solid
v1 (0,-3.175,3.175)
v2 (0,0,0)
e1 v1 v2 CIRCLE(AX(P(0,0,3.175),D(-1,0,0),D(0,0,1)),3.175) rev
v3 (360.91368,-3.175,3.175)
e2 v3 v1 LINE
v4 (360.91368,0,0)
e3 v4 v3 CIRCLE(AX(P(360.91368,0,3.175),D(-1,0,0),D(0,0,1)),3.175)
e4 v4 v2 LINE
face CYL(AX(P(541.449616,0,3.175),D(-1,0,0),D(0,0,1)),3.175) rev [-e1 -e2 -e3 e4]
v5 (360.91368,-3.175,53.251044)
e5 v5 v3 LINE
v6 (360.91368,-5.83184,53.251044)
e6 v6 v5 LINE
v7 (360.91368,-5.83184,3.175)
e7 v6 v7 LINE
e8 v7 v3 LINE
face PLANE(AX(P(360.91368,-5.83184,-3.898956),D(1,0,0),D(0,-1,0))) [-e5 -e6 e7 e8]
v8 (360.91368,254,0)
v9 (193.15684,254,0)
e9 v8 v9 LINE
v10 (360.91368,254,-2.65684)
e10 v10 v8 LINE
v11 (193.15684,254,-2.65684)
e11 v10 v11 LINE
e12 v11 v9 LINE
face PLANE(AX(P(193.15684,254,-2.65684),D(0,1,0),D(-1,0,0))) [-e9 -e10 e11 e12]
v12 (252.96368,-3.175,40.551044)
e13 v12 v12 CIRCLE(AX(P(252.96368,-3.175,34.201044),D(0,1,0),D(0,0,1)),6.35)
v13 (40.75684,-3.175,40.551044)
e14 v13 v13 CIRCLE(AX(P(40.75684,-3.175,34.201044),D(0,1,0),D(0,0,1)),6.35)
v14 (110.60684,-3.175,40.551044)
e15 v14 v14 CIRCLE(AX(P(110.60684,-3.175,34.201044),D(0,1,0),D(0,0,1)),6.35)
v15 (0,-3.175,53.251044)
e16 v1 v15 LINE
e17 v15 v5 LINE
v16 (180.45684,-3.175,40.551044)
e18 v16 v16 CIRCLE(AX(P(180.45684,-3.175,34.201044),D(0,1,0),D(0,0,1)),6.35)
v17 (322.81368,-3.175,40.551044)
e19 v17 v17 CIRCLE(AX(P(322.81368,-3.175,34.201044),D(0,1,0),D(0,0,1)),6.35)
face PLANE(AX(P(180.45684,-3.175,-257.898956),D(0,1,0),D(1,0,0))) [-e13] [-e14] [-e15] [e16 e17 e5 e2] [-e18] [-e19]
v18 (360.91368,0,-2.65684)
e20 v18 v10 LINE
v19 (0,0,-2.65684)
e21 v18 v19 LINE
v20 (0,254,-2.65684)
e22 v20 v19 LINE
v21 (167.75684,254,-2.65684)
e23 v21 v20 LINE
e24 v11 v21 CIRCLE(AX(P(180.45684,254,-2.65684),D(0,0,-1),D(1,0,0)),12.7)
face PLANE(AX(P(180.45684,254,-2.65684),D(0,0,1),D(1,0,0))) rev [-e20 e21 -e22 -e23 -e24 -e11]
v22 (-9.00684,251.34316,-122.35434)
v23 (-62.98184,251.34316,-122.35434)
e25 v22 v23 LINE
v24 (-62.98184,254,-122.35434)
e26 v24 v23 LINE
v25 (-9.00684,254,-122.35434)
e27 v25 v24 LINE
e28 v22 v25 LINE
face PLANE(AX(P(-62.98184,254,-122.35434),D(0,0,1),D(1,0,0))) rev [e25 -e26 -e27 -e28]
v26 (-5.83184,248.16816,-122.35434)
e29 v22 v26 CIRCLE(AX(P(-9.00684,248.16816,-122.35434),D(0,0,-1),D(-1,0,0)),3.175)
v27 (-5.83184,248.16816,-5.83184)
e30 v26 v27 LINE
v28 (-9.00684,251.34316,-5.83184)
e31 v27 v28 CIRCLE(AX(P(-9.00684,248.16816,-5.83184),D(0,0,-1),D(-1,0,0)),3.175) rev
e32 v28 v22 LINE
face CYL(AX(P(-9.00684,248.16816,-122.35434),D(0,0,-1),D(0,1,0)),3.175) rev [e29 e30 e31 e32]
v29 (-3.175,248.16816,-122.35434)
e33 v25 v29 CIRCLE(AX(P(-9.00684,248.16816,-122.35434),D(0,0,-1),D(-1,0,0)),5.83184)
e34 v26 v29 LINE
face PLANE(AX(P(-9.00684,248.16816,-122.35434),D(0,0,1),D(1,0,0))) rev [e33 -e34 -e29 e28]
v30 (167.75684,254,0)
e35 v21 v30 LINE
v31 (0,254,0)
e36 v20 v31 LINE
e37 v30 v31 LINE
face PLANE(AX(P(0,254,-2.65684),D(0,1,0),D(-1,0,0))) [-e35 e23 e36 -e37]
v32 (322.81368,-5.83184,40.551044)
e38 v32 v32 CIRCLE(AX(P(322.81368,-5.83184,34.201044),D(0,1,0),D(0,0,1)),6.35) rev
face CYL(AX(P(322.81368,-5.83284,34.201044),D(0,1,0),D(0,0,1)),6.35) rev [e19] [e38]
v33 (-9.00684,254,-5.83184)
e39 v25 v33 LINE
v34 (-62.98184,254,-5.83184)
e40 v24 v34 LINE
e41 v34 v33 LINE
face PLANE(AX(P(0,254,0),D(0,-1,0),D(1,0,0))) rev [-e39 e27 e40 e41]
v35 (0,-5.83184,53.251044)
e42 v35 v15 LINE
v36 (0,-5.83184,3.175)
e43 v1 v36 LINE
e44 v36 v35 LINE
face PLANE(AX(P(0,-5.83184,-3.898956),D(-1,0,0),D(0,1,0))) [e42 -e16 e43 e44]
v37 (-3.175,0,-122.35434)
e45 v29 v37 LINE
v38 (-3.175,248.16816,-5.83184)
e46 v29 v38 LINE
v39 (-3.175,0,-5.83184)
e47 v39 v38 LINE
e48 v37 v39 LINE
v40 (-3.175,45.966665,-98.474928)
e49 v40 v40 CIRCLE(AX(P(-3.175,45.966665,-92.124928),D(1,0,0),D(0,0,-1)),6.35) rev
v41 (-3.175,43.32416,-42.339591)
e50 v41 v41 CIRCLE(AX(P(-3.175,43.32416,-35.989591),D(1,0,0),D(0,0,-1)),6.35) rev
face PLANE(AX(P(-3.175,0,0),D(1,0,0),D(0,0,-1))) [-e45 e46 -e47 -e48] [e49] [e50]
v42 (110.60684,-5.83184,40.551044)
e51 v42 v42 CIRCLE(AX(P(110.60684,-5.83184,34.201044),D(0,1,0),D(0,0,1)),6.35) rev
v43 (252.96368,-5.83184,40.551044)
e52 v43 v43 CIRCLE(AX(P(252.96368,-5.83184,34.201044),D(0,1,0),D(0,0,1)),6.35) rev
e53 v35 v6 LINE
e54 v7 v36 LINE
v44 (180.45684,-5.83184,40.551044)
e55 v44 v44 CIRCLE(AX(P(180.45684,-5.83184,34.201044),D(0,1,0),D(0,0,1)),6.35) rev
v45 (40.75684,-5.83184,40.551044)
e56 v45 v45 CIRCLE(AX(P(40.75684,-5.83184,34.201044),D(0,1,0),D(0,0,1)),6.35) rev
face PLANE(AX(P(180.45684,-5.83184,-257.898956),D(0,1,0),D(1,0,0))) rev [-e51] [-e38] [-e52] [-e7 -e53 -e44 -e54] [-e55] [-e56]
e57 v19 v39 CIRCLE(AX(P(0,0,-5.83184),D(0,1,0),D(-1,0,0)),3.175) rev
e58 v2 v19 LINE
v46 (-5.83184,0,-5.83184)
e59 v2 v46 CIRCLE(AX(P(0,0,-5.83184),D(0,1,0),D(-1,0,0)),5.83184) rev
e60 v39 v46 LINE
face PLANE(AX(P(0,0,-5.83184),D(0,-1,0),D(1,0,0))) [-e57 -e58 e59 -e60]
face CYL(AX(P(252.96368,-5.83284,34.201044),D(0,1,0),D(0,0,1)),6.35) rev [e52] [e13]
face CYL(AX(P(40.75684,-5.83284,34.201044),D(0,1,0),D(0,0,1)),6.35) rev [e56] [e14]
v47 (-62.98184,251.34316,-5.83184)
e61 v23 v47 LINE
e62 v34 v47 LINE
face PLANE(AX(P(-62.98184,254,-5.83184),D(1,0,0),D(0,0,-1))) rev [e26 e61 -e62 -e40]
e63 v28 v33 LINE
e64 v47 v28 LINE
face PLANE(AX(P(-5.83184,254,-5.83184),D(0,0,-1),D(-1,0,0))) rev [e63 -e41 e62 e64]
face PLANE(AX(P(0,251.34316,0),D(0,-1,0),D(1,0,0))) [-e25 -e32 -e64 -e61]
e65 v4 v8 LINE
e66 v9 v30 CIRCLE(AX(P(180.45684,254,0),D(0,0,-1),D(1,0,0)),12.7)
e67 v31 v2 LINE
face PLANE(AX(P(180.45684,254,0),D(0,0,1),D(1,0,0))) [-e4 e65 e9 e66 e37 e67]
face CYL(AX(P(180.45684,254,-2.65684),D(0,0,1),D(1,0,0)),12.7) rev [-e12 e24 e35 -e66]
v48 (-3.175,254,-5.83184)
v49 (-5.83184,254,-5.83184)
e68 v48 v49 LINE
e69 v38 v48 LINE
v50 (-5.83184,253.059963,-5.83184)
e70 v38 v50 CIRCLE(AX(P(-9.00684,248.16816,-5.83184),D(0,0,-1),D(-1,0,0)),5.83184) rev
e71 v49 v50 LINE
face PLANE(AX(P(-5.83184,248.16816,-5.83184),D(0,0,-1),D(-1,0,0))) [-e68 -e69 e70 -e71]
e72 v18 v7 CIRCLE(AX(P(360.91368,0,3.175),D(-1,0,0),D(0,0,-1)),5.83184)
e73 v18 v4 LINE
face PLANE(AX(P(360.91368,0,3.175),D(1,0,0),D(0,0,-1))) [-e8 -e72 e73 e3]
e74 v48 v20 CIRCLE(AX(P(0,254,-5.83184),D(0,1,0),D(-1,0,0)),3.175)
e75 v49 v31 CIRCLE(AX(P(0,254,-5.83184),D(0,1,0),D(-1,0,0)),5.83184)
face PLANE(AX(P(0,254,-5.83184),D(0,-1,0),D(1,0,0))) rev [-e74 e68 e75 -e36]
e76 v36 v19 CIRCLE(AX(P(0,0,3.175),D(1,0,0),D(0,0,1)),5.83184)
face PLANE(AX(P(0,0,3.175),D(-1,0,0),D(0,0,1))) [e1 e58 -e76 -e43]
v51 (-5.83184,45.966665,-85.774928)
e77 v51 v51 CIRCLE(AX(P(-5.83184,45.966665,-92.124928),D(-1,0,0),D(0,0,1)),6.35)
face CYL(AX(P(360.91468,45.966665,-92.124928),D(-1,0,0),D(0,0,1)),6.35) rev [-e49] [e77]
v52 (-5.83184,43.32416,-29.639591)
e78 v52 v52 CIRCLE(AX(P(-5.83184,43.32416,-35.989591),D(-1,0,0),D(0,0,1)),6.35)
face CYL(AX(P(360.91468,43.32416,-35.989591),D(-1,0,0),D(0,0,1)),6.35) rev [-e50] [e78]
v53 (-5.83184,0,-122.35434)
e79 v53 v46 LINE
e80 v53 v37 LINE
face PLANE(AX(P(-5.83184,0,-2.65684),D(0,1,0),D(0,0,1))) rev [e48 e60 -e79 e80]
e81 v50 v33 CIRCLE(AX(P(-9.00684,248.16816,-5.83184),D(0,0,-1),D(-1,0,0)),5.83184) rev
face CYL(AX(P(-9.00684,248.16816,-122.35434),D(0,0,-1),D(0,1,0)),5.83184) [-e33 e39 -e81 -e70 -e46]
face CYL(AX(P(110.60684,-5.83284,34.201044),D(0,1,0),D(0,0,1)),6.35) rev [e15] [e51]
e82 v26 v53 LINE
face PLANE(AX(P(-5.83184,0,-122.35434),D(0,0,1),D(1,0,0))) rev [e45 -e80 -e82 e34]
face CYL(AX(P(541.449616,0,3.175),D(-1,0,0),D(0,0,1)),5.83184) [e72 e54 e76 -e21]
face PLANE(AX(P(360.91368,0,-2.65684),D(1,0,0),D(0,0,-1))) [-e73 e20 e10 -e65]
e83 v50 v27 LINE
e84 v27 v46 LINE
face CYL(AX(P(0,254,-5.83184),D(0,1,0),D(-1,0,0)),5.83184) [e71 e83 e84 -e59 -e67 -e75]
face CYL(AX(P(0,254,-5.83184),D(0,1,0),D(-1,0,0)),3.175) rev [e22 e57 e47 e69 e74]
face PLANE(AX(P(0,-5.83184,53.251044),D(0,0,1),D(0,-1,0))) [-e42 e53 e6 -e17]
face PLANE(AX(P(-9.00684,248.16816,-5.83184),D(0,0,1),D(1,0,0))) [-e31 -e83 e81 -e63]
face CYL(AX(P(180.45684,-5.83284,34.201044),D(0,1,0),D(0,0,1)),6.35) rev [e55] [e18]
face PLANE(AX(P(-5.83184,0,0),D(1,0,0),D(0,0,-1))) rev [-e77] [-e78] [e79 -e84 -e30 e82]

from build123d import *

# Parameters (mm, degrees)
BASE_FLANGE1_DEPTH           = 2.65684
SKETCHED_BEND3_DEPTH         = 360.91368
SKETCHED_BEND3_2_DEPTH       = 360.91368
SKETCH10_R                   = 6.35
CUT_EXTRUDE2_DEPTH           = 2.65684
EDGE_FLANGE5_DEPTH           = 254
EDGE_FLANGE6_STRIP_W         = 16.97736
EDGE_FLANGE6_STRIP_H         = 2.65684
EDGE_FLANGE6_STRIP_CUT_DEPTH = 116.5225
EDGE_FLANGE6_DEPTH           = 116.5225
SKETCH36_R                   = 6.35
CUT_EXTRUDE4_DEPTH           = 2.65684


# Read off the part's stored shape, not the designer's step: Sketched Bend3
# Sheet-metal steps are written as plain solids
with BuildPart() as part:
    # Sketch1 → Base-Flange1 (new body)
    with BuildSketch(Plane.XY):
        with BuildLine():
            Line((0, 0), (0, 254))
            Line((0, 254), (167.75684, 254))
            ThreePointArc((167.75684, 254), (180.45684, 241.3), (193.15684, 254))
            Line((193.15684, 254), (360.91368, 254))
            Line((360.91368, 254), (360.91368, 0))
            Line((360.91368, 0), (360.91368, -57.15))
            Line((360.91368, -57.15), (0, -57.15))
            Line((0, -57.15), (0, 0))
        make_face()
    extrude(amount=-BASE_FLANGE1_DEPTH)

    # Sketched Bend3 outline → Sketched Bend3 (cut)
    with BuildSketch(Plane.YZ):
        with BuildLine():
            ThreePointArc((0, -2.65684), (-2.783367186, -1.949765838), (-4.891802611, 0))
            Line((-4.891802611, 0), (-57.15, 0))
            Line((-57.15, 0), (-57.15, -2.65684))
            Line((-57.15, -2.65684), (0, -2.65684))
        make_face()
    extrude(amount=SKETCHED_BEND3_DEPTH, mode=Mode.SUBTRACT)

    # Sketched Bend3 2 outline → Sketched Bend3 2 (add)
    with BuildSketch(Plane.YZ):
        with BuildLine():
            ThreePointArc((0, 0), (-2.24506403, 0.92993597), (-3.175, 3.175))
            Line((-3.175, 3.175), (-3.175, 53.251044406))
            Line((-3.175, 53.251044406), (-5.83184, 53.251044406))
            Line((-5.83184, 53.251044406), (-5.83184, 3.175))
            ThreePointArc((-5.83184, 3.175), (-5.591894488, 1.519381136), (-4.891802611, 0))
            Line((-4.891802611, 0), (0, 0))
        make_face()
    extrude(amount=SKETCHED_BEND3_2_DEPTH)

    # Sketch10 → Cut-Extrude2 (cut)
    with BuildSketch(Plane(origin=(0, -3.175, 0), x_dir=(1, 0, 0), z_dir=(0, 1, 0))):
        with Locations(Location((322.81368, -34.201044406, 0), (0, 0, 270))):
            Circle(SKETCH10_R)
        with Locations(Location((252.96368, -34.201044406, 0), (0, 0, 270))):
            Circle(SKETCH10_R)
        with Locations(Location((40.75684, -34.201044406, 0), (0, 0, 270))):
            Circle(SKETCH10_R)
        with Locations(Location((110.60684, -34.201044406, 0), (0, 0, 270))):
            Circle(SKETCH10_R)
        with Locations(Location((180.45684, -34.201044406, 0), (0, 0, 270))):
            Circle(SKETCH10_R)
    extrude(amount=-CUT_EXTRUDE2_DEPTH, mode=Mode.SUBTRACT)

    # Edge-Flange5 section (across the edge) → Edge-Flange5 (add)
    with BuildSketch(Plane(origin=(-3.175, 0, -2.65684), x_dir=(1, 0, 0), z_dir=(0, 1, 0))):
        with BuildLine():
            Line((-2.65684, 3.175), (-2.65684, 119.6975))
            Line((-2.65684, 119.6975), (0, 119.6975))
            Line((0, 119.6975), (0, 3.175))
            ThreePointArc((0, 3.175), (0.92993597, 0.92993597), (3.175, 0))
            Line((3.175, 0), (3.175, -2.65684))
            ThreePointArc((3.175, -2.65684), (-0.948733611, -0.948733611), (-2.65684, 3.175))
        make_face()
    extrude(amount=EDGE_FLANGE5_DEPTH)

    # Edge-Flange6 strip (across the edge) → Edge-Flange6 strip cut (cut)
    with BuildSketch(Plane(origin=(-5.83184, 254, -5.83184), x_dir=(0, -1, 0), z_dir=(0, 0, -1))):
        with Locations((-2.65684, -1.32842)):
            Rectangle(EDGE_FLANGE6_STRIP_W, EDGE_FLANGE6_STRIP_H)
    extrude(amount=EDGE_FLANGE6_STRIP_CUT_DEPTH, mode=Mode.SUBTRACT)

    # Edge-Flange6 section (across the edge) → Edge-Flange6 (add)
    with BuildSketch(Plane(origin=(-5.83184, 254, -5.83184), x_dir=(0, -1, 0), z_dir=(0, 0, -1))):
        with BuildLine():
            Line((0, 3.175), (0, 57.15))
            Line((0, 57.15), (2.65684, 57.15))
            Line((2.65684, 57.15), (2.65684, 3.175))
            ThreePointArc((2.65684, 3.175), (3.58677597, 0.92993597), (5.83184, 0))
            Line((5.83184, 0), (5.83184, -2.65684))
            ThreePointArc((5.83184, -2.65684), (1.708106389, -0.948733611), (0, 3.175))
        make_face()
    extrude(amount=EDGE_FLANGE6_DEPTH)

    # Sketch36 → Cut-Extrude4 (cut)
    with BuildSketch(Plane.ZY.offset(5.83184)):
        with Locations((-35.989590501, 43.324159587)):
            Circle(SKETCH36_R)
        with Locations((-92.124928486, 45.966665125)):
            Circle(SKETCH36_R)
    extrude(amount=-CUT_EXTRUDE4_DEPTH, mode=Mode.SUBTRACT)


solid = part.part
